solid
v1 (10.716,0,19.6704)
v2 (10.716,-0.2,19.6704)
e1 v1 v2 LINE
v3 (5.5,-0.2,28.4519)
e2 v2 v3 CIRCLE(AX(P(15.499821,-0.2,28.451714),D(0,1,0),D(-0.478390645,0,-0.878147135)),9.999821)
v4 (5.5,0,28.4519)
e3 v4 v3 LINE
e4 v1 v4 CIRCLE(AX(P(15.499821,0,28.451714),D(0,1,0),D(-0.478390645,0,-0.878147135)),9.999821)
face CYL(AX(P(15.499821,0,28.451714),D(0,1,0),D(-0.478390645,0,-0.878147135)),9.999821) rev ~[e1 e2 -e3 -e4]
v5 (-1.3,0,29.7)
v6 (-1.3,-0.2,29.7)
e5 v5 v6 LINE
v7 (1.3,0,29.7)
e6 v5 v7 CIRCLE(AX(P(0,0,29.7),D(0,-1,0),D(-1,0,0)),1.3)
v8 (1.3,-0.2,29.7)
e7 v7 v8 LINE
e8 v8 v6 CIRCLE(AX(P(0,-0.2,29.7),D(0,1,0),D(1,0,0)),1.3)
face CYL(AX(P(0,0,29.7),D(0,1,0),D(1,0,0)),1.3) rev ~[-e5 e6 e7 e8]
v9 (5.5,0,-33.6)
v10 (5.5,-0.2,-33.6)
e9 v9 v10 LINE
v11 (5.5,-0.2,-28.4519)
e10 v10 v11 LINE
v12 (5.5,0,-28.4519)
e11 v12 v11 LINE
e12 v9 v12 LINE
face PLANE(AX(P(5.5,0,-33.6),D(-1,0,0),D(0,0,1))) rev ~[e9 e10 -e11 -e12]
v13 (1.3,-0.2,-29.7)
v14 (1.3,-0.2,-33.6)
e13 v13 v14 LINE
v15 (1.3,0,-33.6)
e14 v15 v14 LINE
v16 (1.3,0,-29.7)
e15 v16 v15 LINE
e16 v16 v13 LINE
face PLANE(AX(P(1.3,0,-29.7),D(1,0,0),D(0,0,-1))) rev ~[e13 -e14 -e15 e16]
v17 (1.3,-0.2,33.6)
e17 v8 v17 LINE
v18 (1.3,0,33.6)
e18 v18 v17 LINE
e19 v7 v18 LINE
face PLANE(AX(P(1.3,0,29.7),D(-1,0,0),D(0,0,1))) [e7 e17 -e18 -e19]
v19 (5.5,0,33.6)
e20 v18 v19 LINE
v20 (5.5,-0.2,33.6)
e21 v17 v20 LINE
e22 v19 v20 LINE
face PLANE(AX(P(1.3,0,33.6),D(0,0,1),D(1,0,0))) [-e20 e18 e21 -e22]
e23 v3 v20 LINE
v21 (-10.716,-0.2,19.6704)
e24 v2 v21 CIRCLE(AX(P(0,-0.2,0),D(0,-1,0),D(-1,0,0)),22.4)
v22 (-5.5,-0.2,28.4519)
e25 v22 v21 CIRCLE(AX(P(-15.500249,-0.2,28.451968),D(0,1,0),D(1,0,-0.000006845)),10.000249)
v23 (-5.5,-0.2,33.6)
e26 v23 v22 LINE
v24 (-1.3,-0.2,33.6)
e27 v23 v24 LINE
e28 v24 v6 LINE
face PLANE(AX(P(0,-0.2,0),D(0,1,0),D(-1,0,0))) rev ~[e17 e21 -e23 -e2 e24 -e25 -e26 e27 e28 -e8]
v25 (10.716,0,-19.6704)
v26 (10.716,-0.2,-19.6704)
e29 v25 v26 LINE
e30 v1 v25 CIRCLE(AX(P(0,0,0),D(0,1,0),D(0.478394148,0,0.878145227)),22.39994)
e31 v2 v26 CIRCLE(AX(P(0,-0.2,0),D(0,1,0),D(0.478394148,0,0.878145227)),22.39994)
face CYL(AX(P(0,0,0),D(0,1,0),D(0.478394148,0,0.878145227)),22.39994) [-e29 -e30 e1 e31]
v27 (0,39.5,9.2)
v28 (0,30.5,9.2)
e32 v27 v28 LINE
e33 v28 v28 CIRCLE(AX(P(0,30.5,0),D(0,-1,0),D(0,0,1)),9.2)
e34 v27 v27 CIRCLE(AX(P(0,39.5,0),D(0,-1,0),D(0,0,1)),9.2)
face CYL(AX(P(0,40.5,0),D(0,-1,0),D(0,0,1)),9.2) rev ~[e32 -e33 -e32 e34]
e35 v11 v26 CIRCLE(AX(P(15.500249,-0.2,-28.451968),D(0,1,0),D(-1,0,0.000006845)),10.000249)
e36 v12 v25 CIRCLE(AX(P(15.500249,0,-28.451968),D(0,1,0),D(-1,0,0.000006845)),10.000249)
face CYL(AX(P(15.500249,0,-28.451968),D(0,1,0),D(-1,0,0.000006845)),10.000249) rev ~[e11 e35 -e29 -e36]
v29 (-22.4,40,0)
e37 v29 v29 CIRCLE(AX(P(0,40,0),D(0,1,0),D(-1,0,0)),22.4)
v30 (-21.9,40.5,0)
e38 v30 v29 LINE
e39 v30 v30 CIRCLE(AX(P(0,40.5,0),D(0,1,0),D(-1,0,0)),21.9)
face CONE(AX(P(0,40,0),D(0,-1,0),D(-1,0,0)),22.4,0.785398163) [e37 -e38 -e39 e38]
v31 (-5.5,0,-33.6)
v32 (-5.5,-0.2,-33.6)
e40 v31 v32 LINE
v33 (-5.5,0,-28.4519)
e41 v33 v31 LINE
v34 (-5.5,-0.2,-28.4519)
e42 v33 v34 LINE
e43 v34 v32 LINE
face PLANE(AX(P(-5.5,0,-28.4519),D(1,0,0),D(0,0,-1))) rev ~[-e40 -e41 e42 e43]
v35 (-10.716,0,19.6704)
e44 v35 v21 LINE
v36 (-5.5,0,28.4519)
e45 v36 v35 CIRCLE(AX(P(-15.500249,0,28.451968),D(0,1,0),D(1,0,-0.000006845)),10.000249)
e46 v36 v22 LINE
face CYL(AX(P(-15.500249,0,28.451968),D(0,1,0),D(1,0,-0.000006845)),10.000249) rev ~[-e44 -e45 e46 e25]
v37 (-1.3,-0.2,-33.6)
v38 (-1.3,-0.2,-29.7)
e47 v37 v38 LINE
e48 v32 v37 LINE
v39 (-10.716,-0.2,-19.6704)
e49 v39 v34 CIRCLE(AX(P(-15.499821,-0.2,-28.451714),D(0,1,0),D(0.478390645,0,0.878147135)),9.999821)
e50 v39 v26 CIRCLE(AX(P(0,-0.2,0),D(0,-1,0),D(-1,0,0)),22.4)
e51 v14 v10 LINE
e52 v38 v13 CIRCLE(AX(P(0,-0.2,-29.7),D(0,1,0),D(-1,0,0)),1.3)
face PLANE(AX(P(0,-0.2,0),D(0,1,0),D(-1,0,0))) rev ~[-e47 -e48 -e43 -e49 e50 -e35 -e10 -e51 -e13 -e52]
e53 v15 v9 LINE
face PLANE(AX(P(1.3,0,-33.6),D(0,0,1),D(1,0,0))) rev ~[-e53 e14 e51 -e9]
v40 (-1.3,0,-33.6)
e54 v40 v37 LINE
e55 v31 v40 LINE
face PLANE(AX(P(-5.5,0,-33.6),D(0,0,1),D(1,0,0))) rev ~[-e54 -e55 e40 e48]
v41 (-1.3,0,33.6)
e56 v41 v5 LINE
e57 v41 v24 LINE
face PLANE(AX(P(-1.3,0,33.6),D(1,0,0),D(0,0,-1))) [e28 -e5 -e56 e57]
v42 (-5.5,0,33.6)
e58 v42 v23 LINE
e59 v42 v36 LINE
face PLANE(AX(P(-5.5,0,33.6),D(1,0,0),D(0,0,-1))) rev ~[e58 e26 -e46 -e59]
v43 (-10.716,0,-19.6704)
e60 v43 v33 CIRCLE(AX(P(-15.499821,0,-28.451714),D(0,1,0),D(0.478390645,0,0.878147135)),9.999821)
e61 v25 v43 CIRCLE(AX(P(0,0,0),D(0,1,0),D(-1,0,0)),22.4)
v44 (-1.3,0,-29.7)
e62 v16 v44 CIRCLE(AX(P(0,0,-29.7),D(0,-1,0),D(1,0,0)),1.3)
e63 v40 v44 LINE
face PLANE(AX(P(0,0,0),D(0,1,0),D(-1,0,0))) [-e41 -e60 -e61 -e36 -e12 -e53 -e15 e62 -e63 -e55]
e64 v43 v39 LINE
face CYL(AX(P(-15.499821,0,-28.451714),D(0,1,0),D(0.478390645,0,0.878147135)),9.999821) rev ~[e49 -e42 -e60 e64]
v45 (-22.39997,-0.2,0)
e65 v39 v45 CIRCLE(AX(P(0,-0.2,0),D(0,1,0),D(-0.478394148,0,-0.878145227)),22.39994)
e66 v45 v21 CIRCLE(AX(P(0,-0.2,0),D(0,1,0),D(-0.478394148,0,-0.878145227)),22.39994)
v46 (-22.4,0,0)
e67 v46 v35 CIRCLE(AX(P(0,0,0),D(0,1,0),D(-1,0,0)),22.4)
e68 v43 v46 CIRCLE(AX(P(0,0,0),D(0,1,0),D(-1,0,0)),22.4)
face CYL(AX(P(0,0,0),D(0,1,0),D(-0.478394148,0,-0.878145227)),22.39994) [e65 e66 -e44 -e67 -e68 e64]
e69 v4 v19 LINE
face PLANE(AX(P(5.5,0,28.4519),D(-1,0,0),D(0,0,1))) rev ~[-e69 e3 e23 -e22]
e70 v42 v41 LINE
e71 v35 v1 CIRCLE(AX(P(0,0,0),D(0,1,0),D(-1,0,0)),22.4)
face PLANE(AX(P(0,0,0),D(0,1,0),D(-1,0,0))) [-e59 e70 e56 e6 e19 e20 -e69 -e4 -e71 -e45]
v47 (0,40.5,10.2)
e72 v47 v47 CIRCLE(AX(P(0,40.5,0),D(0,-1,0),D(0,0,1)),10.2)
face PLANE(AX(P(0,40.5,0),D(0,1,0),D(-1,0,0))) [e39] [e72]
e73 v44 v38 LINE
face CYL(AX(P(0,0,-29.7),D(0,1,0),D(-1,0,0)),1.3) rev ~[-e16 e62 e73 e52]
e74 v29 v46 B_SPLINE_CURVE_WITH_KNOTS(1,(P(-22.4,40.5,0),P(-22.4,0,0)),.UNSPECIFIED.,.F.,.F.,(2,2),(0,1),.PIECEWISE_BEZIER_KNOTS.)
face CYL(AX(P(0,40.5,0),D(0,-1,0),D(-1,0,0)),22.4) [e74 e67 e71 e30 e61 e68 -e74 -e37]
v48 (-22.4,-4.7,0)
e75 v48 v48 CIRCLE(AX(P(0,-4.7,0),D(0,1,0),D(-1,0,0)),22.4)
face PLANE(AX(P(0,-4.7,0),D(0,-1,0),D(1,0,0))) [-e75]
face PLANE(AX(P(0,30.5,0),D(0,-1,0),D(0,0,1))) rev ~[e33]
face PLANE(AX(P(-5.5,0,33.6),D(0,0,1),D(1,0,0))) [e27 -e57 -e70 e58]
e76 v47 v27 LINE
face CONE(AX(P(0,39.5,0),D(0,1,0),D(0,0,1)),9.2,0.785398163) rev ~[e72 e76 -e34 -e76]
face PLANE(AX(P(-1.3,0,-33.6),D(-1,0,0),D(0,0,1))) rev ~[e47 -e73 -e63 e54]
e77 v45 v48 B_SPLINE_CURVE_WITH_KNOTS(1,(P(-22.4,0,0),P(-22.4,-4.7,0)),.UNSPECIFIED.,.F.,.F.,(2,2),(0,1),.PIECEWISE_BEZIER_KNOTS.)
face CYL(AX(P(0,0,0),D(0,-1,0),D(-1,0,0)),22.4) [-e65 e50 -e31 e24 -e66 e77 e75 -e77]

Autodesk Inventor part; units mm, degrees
sketch "Sketch1" plane through (0, 0, 0) normal (0, 1, 0) x (-1, 0, 0)
  circle A0 centre (0, 0) radius 22.4
  dimension "d0" = 44.8
ref_plane "Work Plane1" through (0, 40.5, 0) normal (0, 1, 0) x (-1, 0, 0)
sketch "Sketch2" plane through (0, 40.5, 0) normal (0, 1, 0) x (-1, 0, 0)
  circle A0 centre (0, 0) radius 22.4 projected
ref_plane "Work Plane3" through (0, -53, 0) normal (0, 1, 0) x (-1, 0, 0)
ref_plane "Work Plane2" through (0, -41, 0) normal (0, 1, 0) x (-1, 0, 0)
sketch "Sketch3" plane through (0, -41, 0) normal (0, 1, 0) x (-1, 0, 0)
  circle A0 centre (0, 0) radius 33.8
  dimension "d4" = 67.6
sketch "Sketch4" plane through (0, -53, 0) normal (0, 1, 0) x (-1, 0, 0)
  circle A0 centre (0, 0) radius 33.8 projected
loft "Loft1" add profiles "Sketch2", "Sketch1"
loft "Loft3" [suppressed]
sketch "Sketch5" plane through (0, 0, 0) normal (0, 1, 0) x (-1, 0, 0)
  line L0 (-5.5, 33.6) -> (5.5, -33.6) construction
  line L1 (3.6185, 22.1058) -> (-5.5, -33.6) construction
  line L2 (5.5, 33.6) -> (5.5, 28.4519)
  line L3 (5.5, -28.4519) -> (5.5, -33.6)
  line L4 (-5.5, -33.6) -> (-5.5, -28.4519)
  line L5 (-5.5, 28.4519) -> (-5.5, 33.6)
  arc A0 (-10.716, 19.6704) -> (-10.716, -19.6704) centre (0, 0) ccw
  arc A1 (10.716, -19.6704) -> (10.716, 19.6704) centre (0, 0) ccw
  arc A2 (5.5, 28.4519) -> (10.716, 19.6704) centre (15.5, 28.4519) ccw
  arc A3 (-10.716, 19.6704) -> (-5.5, 28.4519) centre (-15.5, 28.4519) ccw
  arc A4 (10.716, -19.6704) -> (5.5, -28.4519) centre (15.5, -28.4519) ccw
  arc A5 (-5.5, -28.4519) -> (-10.716, -19.6704) centre (-15.5, -28.4519) ccw
  circle A6 centre (0, 0) radius 22.4 construction
  line L6 (0, -22.4) -> (0, -33.6) construction
  line L7 (1.3, -33.6) -> (1.3, -29.7)
  line L8 (0, -28.4) -> (0, -28.4)
  line L9 (-1.3, -29.7) -> (-1.3, -33.6)
  arc A7 (1.3, -29.7) -> (0, -28.4) centre (0, -29.7) ccw
  arc A8 (0, -28.4) -> (-1.3, -29.7) centre (0, -29.7) ccw
  line L10 (5.5, -33.6) -> (1.3, -33.6)
  line L11 (-1.3, -33.6) -> (-5.5, -33.6)
  circle A9 centre (0, 0) radius 33.8 construction
  line L12 (33.8, 0) -> (-33.8, 0) construction
  line L13 (0, 22.4) -> (0, 33.6) construction
  line L14 (1.3, 33.6) -> (1.3, 29.7)
  line L15 (-1.3, 29.7) -> (-1.3, 33.6)
  arc A10 (0, 28.4) -> (1.3, 29.7) centre (0, 29.7) ccw
  arc A11 (-1.3, 29.7) -> (0, 28.4) centre (0, 29.7) ccw
  line L16 (5.5, 33.6) -> (1.3, 33.6)
  line L17 (-1.3, 33.6) -> (-5.5, 33.6)
  circle A12 centre (0, 0) radius 33.8 construction
  point P0 (5.5, 21.7143)
  point P1 (5.5, -21.7143)
  point P2 (-5.5, 21.7143)
  point P3 (-5.5, -21.7143)
  point P4 (1.3, -28.4)
  point P5 (-1.3, -28.4)
  point P6 (1.3, 28.4)
  point P7 (-1.3, 28.4)
  point P8 (0, 28.4)
  dimension "d17" = 11
  dimension "d18" = 67.2
  dimension "d19" = 10
  dimension "d20" = 2.6
  dimension "d21" = 5.2
  dimension "d22" = 1.3
extrude "Extrusion1" add sketch "Sketch5" against normal blind 0.2
ref_plane "Work Plane4" through (0, -4.7, 0) normal (0, 1, 0) x (-1, 0, 0)
sketch "Sketch6" plane through (0, -4.7, 0) normal (0, 1, 0) x (-1, 0, 0)
  circle A0 centre (0, 0) radius 22.4 projected
ref_plane "Work Plane5" through (0, -53, 0) normal (0, 1, 0) x (-1, 0, 0)
sketch "Sketch7" plane through (0, -53, 0) normal (0, 1, 0) x (-1, 0, 0)
  circle A0 centre (0, 0) radius 33.8 projected
loft "Loft4" add profiles "Sketch7", "Sketch3"
loft "Loft5" add profiles "Sketch6" section 1 edges at (33.8, -41, 0)
sketch "Sketch8" plane through (0, 0, 0) normal (0, 1, 0) x (-1, 0, 0)
  circle A0 centre (0, 0) radius 22.4 projected
loft "Loft6" add profiles "Sketch8" section 2 edges at (22.4, -4.7, 0)
sketch "Sketch9" plane through (0, 40.5, 0) normal (0, 1, 0) x (1, 0, 0)
  point P0 (0, 0)
  point P1 (0, 0)
hole "Hole1" at (0, 40.5, 0) direction (0, -1, 0) diameter 18.4 depth 10
chamfer "Chamfer1" distance 1 angle 45 1 edges at (0, 40.5, -9.2)
chamfer "Chamfer2" distance 0.5 angle 45 1 edges at (22.4, 40.5, 0)
sketch "Sketch10" plane through (0, -53, 0) normal (0, -1, 0) x (1, 0, 0)
  point P0 (0, 0)
  point P1 (0, 0)
hole "Hole2" at (0, -53, 0) direction (0, 1, 0) diameter 13.5 depth 10
sketch "Sketch11" plane through (0, -53, 0) normal (0, -1, 0) x (1, 0, 0)
  line L0 (56, 85) -> (-56, 85)
  line L1 (-56, 85) -> (-56, -85)
  line L2 (-56, -85) -> (56, -85)
  line L3 (56, -85) -> (56, 85)
  line L4 (56, 85) -> (-56, -85) construction
  line L5 (-56, 85) -> (56, -85) construction
  point P0 (0, 0)
extrude "Extrusion2" cut sketch "Sketch11" against normal blind 48.3
properties part number "shaker cut"
